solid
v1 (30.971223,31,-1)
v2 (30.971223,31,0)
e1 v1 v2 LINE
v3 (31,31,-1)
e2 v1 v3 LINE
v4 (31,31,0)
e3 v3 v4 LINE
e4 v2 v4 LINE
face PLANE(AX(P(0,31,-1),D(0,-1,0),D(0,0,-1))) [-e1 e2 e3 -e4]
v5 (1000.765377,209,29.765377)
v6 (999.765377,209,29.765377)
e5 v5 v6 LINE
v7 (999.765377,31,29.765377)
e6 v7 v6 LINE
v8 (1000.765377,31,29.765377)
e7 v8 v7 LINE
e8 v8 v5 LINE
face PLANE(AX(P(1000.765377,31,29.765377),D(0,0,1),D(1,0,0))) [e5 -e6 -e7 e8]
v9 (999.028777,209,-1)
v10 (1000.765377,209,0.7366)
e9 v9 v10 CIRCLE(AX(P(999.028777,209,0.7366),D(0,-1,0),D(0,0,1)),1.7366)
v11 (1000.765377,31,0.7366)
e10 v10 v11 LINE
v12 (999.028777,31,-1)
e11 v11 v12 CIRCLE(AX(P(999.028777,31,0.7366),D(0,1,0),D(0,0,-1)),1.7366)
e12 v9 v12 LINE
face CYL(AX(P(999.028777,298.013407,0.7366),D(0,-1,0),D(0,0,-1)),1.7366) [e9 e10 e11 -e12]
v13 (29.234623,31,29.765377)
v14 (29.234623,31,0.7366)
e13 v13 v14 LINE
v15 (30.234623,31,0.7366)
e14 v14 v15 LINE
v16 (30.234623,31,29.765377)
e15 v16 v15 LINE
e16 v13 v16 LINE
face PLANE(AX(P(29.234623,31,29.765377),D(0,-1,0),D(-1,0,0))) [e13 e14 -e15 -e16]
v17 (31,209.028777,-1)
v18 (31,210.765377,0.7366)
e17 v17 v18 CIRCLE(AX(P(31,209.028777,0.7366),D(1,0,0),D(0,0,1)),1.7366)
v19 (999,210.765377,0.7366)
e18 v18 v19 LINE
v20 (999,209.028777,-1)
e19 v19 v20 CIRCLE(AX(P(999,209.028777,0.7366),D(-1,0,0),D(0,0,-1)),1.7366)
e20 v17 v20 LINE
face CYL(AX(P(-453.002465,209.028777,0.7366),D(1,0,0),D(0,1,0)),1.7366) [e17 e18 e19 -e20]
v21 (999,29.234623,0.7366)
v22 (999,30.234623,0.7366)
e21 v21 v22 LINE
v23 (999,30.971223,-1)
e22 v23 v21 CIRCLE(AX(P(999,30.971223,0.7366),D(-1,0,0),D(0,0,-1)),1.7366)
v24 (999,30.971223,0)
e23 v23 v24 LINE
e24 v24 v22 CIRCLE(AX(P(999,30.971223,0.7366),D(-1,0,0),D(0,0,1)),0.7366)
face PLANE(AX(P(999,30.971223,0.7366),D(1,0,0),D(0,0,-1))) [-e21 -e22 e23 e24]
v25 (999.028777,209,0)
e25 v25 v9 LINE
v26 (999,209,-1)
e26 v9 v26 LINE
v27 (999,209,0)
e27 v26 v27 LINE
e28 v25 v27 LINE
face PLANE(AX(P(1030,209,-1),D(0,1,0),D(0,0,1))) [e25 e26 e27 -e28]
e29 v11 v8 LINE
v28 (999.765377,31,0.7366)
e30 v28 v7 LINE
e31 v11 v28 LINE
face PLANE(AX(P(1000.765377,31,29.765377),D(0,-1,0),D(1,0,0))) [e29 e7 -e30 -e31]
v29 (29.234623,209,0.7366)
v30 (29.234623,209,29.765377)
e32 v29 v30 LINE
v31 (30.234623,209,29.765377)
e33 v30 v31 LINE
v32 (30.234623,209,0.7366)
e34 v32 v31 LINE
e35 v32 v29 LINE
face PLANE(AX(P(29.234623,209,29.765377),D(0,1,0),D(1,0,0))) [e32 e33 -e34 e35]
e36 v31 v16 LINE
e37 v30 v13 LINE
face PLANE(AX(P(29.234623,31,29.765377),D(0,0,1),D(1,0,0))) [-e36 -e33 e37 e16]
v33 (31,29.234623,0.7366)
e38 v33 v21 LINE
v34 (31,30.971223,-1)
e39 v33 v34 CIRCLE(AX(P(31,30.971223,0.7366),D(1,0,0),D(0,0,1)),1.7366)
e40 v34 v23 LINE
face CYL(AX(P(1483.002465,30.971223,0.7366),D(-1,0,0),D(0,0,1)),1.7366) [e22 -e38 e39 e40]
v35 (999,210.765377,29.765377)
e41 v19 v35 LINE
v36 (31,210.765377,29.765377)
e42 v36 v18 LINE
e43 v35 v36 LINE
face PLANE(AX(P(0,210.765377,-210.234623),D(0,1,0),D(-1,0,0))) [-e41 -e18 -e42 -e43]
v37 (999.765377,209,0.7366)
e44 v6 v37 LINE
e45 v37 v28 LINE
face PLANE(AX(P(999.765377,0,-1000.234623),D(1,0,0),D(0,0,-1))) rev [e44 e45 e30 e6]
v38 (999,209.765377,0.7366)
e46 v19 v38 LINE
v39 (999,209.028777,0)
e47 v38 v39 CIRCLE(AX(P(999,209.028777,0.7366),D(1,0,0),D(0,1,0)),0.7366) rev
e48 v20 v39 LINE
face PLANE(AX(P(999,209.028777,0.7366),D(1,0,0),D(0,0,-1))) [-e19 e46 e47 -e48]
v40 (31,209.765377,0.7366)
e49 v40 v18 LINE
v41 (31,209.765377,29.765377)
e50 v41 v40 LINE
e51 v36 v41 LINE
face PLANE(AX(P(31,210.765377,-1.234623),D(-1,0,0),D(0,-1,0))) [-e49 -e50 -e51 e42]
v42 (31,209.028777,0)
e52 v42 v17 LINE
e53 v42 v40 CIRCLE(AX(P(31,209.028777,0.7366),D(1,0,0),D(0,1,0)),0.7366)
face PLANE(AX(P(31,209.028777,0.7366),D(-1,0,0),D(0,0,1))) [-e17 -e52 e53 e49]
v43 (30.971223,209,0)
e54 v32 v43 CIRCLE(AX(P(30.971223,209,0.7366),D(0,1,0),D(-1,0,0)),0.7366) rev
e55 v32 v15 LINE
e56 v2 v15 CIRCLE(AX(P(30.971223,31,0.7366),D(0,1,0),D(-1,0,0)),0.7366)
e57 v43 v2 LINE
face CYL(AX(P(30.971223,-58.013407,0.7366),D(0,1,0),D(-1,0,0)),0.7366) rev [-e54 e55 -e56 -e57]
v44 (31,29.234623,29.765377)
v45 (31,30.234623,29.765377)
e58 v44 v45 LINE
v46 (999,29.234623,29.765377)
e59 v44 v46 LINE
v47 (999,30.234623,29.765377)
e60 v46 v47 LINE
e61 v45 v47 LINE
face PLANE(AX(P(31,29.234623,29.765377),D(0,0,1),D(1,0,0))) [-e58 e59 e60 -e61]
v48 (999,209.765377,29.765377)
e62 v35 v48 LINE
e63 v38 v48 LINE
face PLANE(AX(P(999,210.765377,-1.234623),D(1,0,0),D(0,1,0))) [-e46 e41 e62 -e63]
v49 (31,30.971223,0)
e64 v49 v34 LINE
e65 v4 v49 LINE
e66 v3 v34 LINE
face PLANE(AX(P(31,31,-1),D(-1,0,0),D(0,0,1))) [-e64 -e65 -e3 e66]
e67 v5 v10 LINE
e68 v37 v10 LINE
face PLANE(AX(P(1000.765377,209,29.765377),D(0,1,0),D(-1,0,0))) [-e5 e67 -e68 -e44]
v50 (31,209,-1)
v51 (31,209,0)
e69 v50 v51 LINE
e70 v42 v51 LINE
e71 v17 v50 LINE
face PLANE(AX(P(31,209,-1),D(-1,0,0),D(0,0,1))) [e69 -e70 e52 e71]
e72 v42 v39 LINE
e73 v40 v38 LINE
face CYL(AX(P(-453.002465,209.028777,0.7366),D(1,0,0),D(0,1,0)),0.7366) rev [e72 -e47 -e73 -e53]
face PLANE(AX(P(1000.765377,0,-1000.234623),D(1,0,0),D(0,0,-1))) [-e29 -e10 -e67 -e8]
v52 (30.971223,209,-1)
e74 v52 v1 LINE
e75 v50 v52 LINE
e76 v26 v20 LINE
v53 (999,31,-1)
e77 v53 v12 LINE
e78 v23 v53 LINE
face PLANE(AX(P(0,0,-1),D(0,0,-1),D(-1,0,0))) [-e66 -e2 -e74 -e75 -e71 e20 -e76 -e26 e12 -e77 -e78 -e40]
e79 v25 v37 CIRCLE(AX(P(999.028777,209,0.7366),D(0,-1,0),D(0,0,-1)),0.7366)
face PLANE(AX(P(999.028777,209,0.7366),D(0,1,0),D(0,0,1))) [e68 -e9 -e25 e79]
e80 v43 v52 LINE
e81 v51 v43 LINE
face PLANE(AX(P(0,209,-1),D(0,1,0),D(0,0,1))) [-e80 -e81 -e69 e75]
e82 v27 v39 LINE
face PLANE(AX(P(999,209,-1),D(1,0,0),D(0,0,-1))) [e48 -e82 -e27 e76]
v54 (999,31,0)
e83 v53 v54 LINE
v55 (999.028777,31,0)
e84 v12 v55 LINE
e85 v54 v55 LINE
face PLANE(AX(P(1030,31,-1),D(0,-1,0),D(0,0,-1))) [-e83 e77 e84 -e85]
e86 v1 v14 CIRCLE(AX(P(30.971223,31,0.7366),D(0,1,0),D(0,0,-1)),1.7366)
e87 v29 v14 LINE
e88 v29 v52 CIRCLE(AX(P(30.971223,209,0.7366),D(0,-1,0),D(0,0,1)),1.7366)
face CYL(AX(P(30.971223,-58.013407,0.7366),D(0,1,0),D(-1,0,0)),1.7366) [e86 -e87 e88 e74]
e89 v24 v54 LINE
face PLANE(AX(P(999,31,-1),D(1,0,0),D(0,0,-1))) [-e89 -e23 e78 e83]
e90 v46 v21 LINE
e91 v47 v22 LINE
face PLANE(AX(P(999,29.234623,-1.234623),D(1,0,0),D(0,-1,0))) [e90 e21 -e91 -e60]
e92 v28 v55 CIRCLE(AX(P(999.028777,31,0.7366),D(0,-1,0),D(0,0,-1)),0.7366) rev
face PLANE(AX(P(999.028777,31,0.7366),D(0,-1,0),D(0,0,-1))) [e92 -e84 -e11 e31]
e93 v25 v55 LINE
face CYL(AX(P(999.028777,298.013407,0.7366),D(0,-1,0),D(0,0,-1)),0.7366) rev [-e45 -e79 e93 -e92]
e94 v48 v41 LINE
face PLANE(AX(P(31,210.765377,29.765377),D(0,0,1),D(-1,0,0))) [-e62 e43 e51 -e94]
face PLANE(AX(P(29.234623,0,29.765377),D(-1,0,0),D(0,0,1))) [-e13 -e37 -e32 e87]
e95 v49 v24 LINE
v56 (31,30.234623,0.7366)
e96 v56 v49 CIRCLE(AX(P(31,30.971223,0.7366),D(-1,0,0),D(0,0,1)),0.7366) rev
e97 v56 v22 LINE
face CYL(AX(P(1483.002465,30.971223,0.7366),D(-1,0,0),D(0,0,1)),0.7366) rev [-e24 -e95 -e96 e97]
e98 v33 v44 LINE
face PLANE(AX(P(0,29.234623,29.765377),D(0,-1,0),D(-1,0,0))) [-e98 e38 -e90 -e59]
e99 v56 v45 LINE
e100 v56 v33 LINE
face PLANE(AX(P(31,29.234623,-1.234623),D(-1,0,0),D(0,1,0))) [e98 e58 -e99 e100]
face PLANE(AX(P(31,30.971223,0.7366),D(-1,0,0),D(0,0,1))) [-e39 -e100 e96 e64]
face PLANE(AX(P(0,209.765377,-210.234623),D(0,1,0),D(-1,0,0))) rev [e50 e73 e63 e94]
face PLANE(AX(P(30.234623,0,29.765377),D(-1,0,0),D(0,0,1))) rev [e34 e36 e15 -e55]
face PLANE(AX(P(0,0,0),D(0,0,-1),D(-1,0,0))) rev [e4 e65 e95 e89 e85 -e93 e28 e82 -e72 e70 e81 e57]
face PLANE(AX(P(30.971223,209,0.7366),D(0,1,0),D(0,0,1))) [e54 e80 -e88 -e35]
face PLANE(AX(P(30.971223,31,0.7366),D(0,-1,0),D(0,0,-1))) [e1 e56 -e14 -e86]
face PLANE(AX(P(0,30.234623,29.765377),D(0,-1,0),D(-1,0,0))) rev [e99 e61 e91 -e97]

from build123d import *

# Parameters (mm, degrees)
BASE_FLANGE1_DEPTH         = 1
SKETCHED_START             = 31
SKETCHED_BEND1_DEPTH       = 178
SKETCHED_BEND1_2_DEPTH     = 968
SKETCHED_BEND1_3_OUTLINE_W = 968
SKETCHED_BEND1_3_OUTLINE_H = 1
SKETCHED_BEND1_3_DEPTH     = 29.234623369
SKETCHED_START_2           = 210.765376631
SKETCHED_BEND1_4_OUTLINE_W = 968
SKETCHED_BEND1_4_OUTLINE_H = 1
SKETCHED_BEND1_4_DEPTH     = 29.234623369
SKETCHED_BEND1_5_DEPTH     = 178
SKETCHED_BEND1_6_DEPTH     = 968
SKETCHED_BEND1_7_OUTLINE_W = 178
SKETCHED_BEND1_7_OUTLINE_H = 1
SKETCHED_BEND1_7_DEPTH     = 29.234623369
SKETCHED_START_3           = 1000.765376631
SKETCHED_BEND1_8_OUTLINE_W = 178
SKETCHED_BEND1_8_OUTLINE_H = 1
SKETCHED_BEND1_8_DEPTH     = 29.234623369


# Read off the part's stored shape, not the designer's step: Sketched Bend1
# Sheet-metal steps are written as plain solids
with BuildPart() as part:
    # Sketch1 → Base-Flange1 (new body)
    with BuildSketch(Plane.XY):
        Polygon((0, 209), (31, 209), (31, 240), (999, 240), (999, 209), (1030, 209), (1030, 31), (999, 31), (999, 0), (31, 0), (31, 31), (0, 31), align=None)
    extrude(amount=-BASE_FLANGE1_DEPTH)

    # Sketched Bend1 outline → Sketched Bend1 (add)
    with BuildSketch(Plane(origin=(0, 0, 0), x_dir=(1, 0, 0), z_dir=(0, 1, 0)).offset(SKETCHED_START)):
        with BuildLine():
            Line((29.234623369, -0.7366), (29.234623369, -29.765376631))
            Line((29.234623369, -29.765376631), (30.234623369, -29.765376631))
            Line((30.234623369, -29.765376631), (30.234623369, -0.7366))
            ThreePointArc((30.234623369, -0.7366), (30.450368514, -0.215745145), (30.971223369, 0))
            Line((30.971223369, 0), (29.398582279, 0))
            ThreePointArc((29.398582279, 0), (29.276108612, -0.359286442), (29.234623369, -0.7366))
        make_face()
        with BuildLine():
            Line((1000.601417721, 0), (999.028776631, 0))
            ThreePointArc((999.028776631, 0), (999.549631486, -0.215745145), (999.765376631, -0.7366))
            Line((999.765376631, -0.7366), (999.765376631, -29.765376631))
            Line((999.765376631, -29.765376631), (1000.765376631, -29.765376631))
            Line((1000.765376631, -29.765376631), (1000.765376631, -0.7366))
            ThreePointArc((1000.765376631, -0.7366), (1000.723891388, -0.359286442), (1000.601417721, 0))
        make_face()
    extrude(amount=SKETCHED_BEND1_DEPTH)

    # Sketched Bend1 2 outline → Sketched Bend1 2 (add)
    with BuildSketch(Plane.YZ.offset(SKETCHED_START)):
        with BuildLine():
            Line((209.028776631, 0), (210.601417721, 0))
            ThreePointArc((210.601417721, 0), (210.723891388, 0.359286442), (210.765376631, 0.7366))
            Line((210.765376631, 0.7366), (210.765376631, 29.765376631))
            Line((210.765376631, 29.765376631), (209.765376631, 29.765376631))
            Line((209.765376631, 29.765376631), (209.765376631, 0.7366))
            ThreePointArc((209.765376631, 0.7366), (209.549631486, 0.215745145), (209.028776631, 0))
        make_face()
        with BuildLine():
            ThreePointArc((29.234623369, 0.7366), (29.276108612, 0.359286442), (29.398582279, 0))
            Line((29.398582279, 0), (30.971223369, 0))
            ThreePointArc((30.971223369, 0), (30.450368514, 0.215745145), (30.234623369, 0.7366))
            Line((30.234623369, 0.7366), (30.234623369, 29.765376631))
            Line((30.234623369, 29.765376631), (29.234623369, 29.765376631))
            Line((29.234623369, 29.765376631), (29.234623369, 0.7366))
        make_face()
    extrude(amount=SKETCHED_BEND1_2_DEPTH)

    # Sketched Bend1 3 outline → Sketched Bend1 3 (cut)
    with BuildSketch(Plane(origin=(0, 0, 0), x_dir=(1, 0, 0), z_dir=(0, 1, 0))):
        with Locations((515, 0.5)):
            Rectangle(SKETCHED_BEND1_3_OUTLINE_W, SKETCHED_BEND1_3_OUTLINE_H)
    extrude(amount=SKETCHED_BEND1_3_DEPTH, mode=Mode.SUBTRACT)

    # Sketched Bend1 4 outline → Sketched Bend1 4 (cut)
    with BuildSketch(Plane(origin=(0, 0, 0), x_dir=(1, 0, 0), z_dir=(0, 1, 0)).offset(SKETCHED_START_2)):
        with Locations((515, 0.5)):
            Rectangle(SKETCHED_BEND1_4_OUTLINE_W, SKETCHED_BEND1_4_OUTLINE_H)
    extrude(amount=SKETCHED_BEND1_4_DEPTH, mode=Mode.SUBTRACT)

    # Sketched Bend1 5 outline → Sketched Bend1 5 (cut)
    with BuildSketch(Plane(origin=(0, 0, 0), x_dir=(1, 0, 0), z_dir=(0, 1, 0)).offset(SKETCHED_START)):
        with BuildLine():
            Line((0, 0), (29.398582279, 0))
            ThreePointArc((29.398582279, 0), (30.039397205, 0.728828115), (30.971223369, 1))
            Line((30.971223369, 1), (0, 1))
            Line((0, 1), (0, 0))
        make_face()
        with BuildLine():
            Line((1030, 1), (999.028776631, 1))
            ThreePointArc((999.028776631, 1), (999.960602795, 0.728828115), (1000.601417721, 0))
            Line((1000.601417721, 0), (1030, 0))
            Line((1030, 0), (1030, 1))
        make_face()
    extrude(amount=SKETCHED_BEND1_5_DEPTH, mode=Mode.SUBTRACT)

    # Sketched Bend1 6 outline → Sketched Bend1 6 (cut)
    with BuildSketch(Plane.YZ.offset(SKETCHED_START)):
        with BuildLine():
            ThreePointArc((210.601417721, 0), (209.960602795, -0.728828115), (209.028776631, -1))
            Line((209.028776631, -1), (240, -1))
            Line((240, -1), (240, 0))
            Line((240, 0), (210.601417721, 0))
        make_face()
        with BuildLine():
            Line((0, -1), (30.971223369, -1))
            ThreePointArc((30.971223369, -1), (30.039397205, -0.728828115), (29.398582279, 0))
            Line((29.398582279, 0), (0, 0))
            Line((0, 0), (0, -1))
        make_face()
    extrude(amount=SKETCHED_BEND1_6_DEPTH, mode=Mode.SUBTRACT)

    # Sketched Bend1 7 outline → Sketched Bend1 7 (cut)
    with BuildSketch(Plane.YZ):
        with Locations((120, -0.5)):
            Rectangle(SKETCHED_BEND1_7_OUTLINE_W, SKETCHED_BEND1_7_OUTLINE_H)
    extrude(amount=SKETCHED_BEND1_7_DEPTH, mode=Mode.SUBTRACT)

    # Sketched Bend1 8 outline → Sketched Bend1 8 (cut)
    with BuildSketch(Plane.YZ.offset(SKETCHED_START_3)):
        with Locations((120, -0.5)):
            Rectangle(SKETCHED_BEND1_8_OUTLINE_W, SKETCHED_BEND1_8_OUTLINE_H)
    extrude(amount=SKETCHED_BEND1_8_DEPTH, mode=Mode.SUBTRACT)


solid = part.part
